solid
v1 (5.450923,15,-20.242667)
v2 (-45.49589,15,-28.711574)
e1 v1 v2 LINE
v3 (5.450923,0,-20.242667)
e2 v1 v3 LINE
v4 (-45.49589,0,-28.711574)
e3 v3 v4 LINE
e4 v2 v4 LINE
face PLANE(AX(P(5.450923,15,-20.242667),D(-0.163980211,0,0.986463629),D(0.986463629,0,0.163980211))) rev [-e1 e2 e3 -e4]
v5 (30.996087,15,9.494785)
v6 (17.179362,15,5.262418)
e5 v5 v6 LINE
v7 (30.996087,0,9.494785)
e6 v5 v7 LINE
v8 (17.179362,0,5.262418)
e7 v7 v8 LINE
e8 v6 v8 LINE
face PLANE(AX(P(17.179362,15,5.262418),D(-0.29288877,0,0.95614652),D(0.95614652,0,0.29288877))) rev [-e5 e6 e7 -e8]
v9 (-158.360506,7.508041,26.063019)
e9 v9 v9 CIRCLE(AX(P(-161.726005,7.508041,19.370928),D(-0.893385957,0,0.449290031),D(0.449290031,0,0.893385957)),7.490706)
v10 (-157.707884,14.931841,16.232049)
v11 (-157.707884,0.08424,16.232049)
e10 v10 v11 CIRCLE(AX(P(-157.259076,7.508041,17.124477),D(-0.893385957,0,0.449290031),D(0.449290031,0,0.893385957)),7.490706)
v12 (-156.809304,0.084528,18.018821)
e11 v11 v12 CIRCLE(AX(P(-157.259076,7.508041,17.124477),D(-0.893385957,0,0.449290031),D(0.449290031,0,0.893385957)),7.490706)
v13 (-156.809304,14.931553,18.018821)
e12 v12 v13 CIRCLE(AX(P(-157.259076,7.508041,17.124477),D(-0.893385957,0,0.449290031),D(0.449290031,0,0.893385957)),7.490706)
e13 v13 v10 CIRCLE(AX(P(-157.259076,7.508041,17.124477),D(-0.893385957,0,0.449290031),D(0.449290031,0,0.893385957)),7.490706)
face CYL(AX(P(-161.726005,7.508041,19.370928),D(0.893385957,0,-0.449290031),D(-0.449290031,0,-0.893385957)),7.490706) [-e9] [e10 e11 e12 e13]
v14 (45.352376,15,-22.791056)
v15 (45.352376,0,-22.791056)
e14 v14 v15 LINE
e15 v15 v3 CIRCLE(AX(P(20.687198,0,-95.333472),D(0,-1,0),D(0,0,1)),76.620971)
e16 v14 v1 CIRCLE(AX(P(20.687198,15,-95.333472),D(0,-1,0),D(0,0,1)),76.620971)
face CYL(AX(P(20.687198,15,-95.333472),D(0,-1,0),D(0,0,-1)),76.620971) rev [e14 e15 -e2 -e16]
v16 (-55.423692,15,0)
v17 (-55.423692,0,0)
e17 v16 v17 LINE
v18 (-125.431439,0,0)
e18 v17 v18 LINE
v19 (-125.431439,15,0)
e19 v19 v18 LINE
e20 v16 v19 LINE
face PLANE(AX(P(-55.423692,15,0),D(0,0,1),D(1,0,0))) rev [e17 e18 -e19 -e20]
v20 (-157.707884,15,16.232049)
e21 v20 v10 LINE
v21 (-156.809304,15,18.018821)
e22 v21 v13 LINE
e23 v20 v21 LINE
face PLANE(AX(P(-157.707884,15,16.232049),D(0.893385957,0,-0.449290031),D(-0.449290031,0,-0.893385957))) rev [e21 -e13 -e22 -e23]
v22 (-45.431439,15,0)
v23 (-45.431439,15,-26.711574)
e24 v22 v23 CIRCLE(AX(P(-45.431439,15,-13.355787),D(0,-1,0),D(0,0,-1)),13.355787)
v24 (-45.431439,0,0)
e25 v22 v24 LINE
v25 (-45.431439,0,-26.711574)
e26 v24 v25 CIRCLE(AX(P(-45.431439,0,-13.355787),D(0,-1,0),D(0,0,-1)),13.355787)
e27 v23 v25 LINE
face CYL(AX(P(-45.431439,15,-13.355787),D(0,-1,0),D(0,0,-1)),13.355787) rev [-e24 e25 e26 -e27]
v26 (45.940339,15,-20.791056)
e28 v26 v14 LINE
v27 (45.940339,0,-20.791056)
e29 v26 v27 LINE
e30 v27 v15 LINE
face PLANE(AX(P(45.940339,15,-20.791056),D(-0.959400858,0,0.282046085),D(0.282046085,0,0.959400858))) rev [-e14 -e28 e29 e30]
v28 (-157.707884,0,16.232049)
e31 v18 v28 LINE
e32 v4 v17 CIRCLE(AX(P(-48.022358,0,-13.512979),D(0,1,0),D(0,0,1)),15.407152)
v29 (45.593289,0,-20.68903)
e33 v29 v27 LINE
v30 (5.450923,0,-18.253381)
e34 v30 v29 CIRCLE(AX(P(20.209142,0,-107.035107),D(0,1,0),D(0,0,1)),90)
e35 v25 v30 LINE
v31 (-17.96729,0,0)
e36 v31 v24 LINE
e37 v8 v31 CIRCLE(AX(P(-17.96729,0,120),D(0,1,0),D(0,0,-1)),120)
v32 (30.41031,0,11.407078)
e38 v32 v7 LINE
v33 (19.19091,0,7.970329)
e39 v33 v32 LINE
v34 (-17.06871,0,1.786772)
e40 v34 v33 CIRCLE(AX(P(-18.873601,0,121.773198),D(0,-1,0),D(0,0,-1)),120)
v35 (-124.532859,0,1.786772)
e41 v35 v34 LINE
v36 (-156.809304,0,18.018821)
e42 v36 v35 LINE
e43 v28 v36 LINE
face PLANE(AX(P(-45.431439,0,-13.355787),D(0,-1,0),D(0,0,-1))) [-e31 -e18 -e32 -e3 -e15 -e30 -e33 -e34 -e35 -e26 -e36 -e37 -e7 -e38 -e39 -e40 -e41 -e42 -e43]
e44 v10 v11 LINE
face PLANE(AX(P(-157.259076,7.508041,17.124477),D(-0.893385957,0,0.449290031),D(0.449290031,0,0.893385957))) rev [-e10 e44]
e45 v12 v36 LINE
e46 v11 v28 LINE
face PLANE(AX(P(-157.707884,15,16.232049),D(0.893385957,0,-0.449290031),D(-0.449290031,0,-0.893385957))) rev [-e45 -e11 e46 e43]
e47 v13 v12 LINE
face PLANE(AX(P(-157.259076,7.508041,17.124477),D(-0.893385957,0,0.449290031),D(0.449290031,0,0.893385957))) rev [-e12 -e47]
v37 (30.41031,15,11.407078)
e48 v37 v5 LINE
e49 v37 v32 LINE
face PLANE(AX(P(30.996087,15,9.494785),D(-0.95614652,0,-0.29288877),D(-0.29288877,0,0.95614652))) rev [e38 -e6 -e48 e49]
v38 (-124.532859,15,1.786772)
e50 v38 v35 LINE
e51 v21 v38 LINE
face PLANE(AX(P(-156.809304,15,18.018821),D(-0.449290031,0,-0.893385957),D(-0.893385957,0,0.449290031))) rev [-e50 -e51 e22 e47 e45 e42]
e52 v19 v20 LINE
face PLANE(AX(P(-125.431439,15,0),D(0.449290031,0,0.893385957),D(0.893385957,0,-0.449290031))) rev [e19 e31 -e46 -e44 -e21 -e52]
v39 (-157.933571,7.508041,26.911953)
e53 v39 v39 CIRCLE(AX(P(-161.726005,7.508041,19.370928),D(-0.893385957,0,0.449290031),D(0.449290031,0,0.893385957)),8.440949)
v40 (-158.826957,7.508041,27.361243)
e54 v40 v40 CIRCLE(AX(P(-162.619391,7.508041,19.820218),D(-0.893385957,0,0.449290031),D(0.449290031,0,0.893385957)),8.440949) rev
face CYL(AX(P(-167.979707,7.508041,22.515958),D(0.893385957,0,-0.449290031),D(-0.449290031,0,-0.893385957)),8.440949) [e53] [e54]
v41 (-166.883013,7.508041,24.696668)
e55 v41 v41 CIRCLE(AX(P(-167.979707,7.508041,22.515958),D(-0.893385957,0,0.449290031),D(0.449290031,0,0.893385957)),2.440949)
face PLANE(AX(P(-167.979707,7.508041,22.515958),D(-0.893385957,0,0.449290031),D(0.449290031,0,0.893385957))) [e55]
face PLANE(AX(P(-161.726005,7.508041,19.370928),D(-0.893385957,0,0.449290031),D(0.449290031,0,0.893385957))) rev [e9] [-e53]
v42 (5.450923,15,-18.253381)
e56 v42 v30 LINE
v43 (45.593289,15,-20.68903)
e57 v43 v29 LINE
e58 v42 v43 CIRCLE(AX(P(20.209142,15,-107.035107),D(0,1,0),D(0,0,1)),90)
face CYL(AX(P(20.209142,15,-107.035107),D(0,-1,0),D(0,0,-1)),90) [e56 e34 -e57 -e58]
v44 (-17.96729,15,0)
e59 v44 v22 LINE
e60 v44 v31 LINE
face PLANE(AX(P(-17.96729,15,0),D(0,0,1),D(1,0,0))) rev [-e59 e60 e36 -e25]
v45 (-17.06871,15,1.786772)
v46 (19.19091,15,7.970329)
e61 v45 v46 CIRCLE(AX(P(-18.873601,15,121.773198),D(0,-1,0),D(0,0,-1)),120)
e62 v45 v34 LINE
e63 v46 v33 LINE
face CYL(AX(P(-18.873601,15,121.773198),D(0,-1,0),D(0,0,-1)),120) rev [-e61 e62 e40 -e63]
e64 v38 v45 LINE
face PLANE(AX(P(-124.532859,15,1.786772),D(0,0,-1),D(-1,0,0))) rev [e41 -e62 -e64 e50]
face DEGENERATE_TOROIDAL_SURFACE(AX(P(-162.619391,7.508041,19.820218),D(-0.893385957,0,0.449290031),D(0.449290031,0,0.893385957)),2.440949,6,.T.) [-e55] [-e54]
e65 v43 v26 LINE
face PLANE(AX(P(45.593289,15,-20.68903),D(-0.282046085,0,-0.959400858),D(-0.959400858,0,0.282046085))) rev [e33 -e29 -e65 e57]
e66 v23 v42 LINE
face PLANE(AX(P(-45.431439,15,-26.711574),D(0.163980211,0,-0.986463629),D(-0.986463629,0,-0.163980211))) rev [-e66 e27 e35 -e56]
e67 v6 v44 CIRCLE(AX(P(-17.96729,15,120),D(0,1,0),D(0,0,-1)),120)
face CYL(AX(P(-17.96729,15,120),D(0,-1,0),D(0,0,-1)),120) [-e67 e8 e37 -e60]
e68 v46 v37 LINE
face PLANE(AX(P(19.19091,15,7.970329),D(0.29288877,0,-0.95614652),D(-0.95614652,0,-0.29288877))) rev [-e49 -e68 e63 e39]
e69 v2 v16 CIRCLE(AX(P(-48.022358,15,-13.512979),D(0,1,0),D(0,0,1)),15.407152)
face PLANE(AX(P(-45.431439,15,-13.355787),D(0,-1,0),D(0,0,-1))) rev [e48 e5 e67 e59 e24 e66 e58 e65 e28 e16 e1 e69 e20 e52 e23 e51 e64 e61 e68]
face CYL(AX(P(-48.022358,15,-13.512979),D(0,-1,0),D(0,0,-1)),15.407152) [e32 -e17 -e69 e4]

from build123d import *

# Parameters (mm, degrees)
BOSS_EXTRUDE1_DEPTH = 15
SKETCH2_R           = 7.490706033
BOSS_EXTRUDE2_DEPTH = 5
SKETCH3_R           = 8.44094948
BOSS_EXTRUDE3_DEPTH = 7
FILLET1_R           = 1


with BuildPart() as part:
    # Sketch1 → Boss-Extrude1 (new body)
    with BuildSketch(Plane(origin=(0, 0, 0), x_dir=(1, 0, 0), z_dir=(0, 1, 0))):
        with BuildLine():
            Line((-17.967290282, 0), (-45.431439127, 0))
            ThreePointArc((-45.431439127, 0), (-58.787226235, 13.355787108), (-45.431439127, 26.711574216))
            Line((-45.431439127, 26.711574216), (5.45092281, 18.253380544))
            ThreePointArc((5.45092281, 18.253380544), (25.659892843, 17.20031813), (45.593289448, 20.689029929))
            Line((45.593289448, 20.689029929), (45.940338636, 20.791055963))
            Line((45.940338636, 20.791055963), (45.352375673, 22.791055963))
            ThreePointArc((45.352375673, 22.791055963), (25.570805515, 18.868293737), (5.45092281, 20.242666786))
            Line((5.45092281, 20.242666786), (-45.495890395, 28.711574216))
            ThreePointArc((-45.495890395, 28.711574216), (-62.583598174, 18.547920568), (-55.423692083, 0))
            Line((-55.423692083, 0), (-125.431439127, 0))
            Line((-125.431439127, 0), (-157.707883989, -16.232049306))
            Line((-157.707883989, -16.232049306), (-156.809303927, -18.01882122))
            Line((-156.809303927, -18.01882122), (-124.532859065, -1.786771914))
            Line((-124.532859065, -1.786771914), (-17.068710221, -1.786771914))
            ThreePointArc((-17.068710221, -1.786771914), (1.299435065, -3.480980646), (19.190909572, -7.970328534))
            Line((19.190909572, -7.970328534), (30.410309542, -11.40707822))
            Line((30.410309542, -11.40707822), (30.996087081, -9.494785179))
            Line((30.996087081, -9.494785179), (17.179362085, -5.262417546))
            ThreePointArc((17.179362085, -5.262417546), (-0.198073846, -1.322896281), (-17.967290282, 0))
        make_face()
    extrude(amount=BOSS_EXTRUDE1_DEPTH)

    # Sketch2 → Boss-Extrude2 (add)
    with BuildSketch(Plane(origin=(-132.388101561, 0, 66.578899913), x_dir=(0.4492900307338926, 0, 0.8933859570662267), z_dir=(-0.8933859570662267, 0, 0.4492900307338926))):
        with Locations(Location((-55.356167213, 7.508040546, 0), (0, 0, 97.663545488))):
            Circle(SKETCH2_R)
    extrude(amount=BOSS_EXTRUDE2_DEPTH)

    # Sketch3 → Boss-Extrude3 (add)
    with BuildSketch(Plane(origin=(-136.855031347, 0, 68.825350067), x_dir=(0.4492900307338926, 0, 0.8933859570662267), z_dir=(-0.8933859570662267, 0, 0.4492900307338926))):
        with Locations((-55.356167213, 7.508040546)):
            Circle(SKETCH3_R)
    extrude(amount=BOSS_EXTRUDE3_DEPTH)

    # Fillet1
    fillet1_edges = [part.edges().sort_by_distance(p)[0] for p in [
        (-171.772141566, 7.508040546, 14.974932127),
    ]]
    fillet(fillet1_edges, radius=FILLET1_R)

    # Fillet3: read off the stored shape, not the designer's step
    # Fillet3 outline → Fillet3 (revolve, cut)
    with BuildSketch(Plane(origin=(-24.870974068, 7.508040546, -49.454422425), x_dir=(0.4492900307338924, 0, 0.8933859570662267), z_dir=(0, 1, 0))):
        with BuildLine():
            Line((8.44094948, -159.186906806), (8.44094948, -154.186906806))
            ThreePointArc((8.44094948, -154.186906806), (6.683590167, -158.429547493), (2.44094948, -160.186906806))
            Line((2.44094948, -160.186906806), (7.44094948, -160.186906806))
            ThreePointArc((7.44094948, -160.186906806), (8.148056261, -159.894013587), (8.44094948, -159.186906806))
        make_face()
    revolve(axis=Axis((-24.870974068, 7.508040546, -49.454422425), (0.8933859570662267, 0, -0.4492900307338924)), mode=Mode.SUBTRACT)


solid = part.part
